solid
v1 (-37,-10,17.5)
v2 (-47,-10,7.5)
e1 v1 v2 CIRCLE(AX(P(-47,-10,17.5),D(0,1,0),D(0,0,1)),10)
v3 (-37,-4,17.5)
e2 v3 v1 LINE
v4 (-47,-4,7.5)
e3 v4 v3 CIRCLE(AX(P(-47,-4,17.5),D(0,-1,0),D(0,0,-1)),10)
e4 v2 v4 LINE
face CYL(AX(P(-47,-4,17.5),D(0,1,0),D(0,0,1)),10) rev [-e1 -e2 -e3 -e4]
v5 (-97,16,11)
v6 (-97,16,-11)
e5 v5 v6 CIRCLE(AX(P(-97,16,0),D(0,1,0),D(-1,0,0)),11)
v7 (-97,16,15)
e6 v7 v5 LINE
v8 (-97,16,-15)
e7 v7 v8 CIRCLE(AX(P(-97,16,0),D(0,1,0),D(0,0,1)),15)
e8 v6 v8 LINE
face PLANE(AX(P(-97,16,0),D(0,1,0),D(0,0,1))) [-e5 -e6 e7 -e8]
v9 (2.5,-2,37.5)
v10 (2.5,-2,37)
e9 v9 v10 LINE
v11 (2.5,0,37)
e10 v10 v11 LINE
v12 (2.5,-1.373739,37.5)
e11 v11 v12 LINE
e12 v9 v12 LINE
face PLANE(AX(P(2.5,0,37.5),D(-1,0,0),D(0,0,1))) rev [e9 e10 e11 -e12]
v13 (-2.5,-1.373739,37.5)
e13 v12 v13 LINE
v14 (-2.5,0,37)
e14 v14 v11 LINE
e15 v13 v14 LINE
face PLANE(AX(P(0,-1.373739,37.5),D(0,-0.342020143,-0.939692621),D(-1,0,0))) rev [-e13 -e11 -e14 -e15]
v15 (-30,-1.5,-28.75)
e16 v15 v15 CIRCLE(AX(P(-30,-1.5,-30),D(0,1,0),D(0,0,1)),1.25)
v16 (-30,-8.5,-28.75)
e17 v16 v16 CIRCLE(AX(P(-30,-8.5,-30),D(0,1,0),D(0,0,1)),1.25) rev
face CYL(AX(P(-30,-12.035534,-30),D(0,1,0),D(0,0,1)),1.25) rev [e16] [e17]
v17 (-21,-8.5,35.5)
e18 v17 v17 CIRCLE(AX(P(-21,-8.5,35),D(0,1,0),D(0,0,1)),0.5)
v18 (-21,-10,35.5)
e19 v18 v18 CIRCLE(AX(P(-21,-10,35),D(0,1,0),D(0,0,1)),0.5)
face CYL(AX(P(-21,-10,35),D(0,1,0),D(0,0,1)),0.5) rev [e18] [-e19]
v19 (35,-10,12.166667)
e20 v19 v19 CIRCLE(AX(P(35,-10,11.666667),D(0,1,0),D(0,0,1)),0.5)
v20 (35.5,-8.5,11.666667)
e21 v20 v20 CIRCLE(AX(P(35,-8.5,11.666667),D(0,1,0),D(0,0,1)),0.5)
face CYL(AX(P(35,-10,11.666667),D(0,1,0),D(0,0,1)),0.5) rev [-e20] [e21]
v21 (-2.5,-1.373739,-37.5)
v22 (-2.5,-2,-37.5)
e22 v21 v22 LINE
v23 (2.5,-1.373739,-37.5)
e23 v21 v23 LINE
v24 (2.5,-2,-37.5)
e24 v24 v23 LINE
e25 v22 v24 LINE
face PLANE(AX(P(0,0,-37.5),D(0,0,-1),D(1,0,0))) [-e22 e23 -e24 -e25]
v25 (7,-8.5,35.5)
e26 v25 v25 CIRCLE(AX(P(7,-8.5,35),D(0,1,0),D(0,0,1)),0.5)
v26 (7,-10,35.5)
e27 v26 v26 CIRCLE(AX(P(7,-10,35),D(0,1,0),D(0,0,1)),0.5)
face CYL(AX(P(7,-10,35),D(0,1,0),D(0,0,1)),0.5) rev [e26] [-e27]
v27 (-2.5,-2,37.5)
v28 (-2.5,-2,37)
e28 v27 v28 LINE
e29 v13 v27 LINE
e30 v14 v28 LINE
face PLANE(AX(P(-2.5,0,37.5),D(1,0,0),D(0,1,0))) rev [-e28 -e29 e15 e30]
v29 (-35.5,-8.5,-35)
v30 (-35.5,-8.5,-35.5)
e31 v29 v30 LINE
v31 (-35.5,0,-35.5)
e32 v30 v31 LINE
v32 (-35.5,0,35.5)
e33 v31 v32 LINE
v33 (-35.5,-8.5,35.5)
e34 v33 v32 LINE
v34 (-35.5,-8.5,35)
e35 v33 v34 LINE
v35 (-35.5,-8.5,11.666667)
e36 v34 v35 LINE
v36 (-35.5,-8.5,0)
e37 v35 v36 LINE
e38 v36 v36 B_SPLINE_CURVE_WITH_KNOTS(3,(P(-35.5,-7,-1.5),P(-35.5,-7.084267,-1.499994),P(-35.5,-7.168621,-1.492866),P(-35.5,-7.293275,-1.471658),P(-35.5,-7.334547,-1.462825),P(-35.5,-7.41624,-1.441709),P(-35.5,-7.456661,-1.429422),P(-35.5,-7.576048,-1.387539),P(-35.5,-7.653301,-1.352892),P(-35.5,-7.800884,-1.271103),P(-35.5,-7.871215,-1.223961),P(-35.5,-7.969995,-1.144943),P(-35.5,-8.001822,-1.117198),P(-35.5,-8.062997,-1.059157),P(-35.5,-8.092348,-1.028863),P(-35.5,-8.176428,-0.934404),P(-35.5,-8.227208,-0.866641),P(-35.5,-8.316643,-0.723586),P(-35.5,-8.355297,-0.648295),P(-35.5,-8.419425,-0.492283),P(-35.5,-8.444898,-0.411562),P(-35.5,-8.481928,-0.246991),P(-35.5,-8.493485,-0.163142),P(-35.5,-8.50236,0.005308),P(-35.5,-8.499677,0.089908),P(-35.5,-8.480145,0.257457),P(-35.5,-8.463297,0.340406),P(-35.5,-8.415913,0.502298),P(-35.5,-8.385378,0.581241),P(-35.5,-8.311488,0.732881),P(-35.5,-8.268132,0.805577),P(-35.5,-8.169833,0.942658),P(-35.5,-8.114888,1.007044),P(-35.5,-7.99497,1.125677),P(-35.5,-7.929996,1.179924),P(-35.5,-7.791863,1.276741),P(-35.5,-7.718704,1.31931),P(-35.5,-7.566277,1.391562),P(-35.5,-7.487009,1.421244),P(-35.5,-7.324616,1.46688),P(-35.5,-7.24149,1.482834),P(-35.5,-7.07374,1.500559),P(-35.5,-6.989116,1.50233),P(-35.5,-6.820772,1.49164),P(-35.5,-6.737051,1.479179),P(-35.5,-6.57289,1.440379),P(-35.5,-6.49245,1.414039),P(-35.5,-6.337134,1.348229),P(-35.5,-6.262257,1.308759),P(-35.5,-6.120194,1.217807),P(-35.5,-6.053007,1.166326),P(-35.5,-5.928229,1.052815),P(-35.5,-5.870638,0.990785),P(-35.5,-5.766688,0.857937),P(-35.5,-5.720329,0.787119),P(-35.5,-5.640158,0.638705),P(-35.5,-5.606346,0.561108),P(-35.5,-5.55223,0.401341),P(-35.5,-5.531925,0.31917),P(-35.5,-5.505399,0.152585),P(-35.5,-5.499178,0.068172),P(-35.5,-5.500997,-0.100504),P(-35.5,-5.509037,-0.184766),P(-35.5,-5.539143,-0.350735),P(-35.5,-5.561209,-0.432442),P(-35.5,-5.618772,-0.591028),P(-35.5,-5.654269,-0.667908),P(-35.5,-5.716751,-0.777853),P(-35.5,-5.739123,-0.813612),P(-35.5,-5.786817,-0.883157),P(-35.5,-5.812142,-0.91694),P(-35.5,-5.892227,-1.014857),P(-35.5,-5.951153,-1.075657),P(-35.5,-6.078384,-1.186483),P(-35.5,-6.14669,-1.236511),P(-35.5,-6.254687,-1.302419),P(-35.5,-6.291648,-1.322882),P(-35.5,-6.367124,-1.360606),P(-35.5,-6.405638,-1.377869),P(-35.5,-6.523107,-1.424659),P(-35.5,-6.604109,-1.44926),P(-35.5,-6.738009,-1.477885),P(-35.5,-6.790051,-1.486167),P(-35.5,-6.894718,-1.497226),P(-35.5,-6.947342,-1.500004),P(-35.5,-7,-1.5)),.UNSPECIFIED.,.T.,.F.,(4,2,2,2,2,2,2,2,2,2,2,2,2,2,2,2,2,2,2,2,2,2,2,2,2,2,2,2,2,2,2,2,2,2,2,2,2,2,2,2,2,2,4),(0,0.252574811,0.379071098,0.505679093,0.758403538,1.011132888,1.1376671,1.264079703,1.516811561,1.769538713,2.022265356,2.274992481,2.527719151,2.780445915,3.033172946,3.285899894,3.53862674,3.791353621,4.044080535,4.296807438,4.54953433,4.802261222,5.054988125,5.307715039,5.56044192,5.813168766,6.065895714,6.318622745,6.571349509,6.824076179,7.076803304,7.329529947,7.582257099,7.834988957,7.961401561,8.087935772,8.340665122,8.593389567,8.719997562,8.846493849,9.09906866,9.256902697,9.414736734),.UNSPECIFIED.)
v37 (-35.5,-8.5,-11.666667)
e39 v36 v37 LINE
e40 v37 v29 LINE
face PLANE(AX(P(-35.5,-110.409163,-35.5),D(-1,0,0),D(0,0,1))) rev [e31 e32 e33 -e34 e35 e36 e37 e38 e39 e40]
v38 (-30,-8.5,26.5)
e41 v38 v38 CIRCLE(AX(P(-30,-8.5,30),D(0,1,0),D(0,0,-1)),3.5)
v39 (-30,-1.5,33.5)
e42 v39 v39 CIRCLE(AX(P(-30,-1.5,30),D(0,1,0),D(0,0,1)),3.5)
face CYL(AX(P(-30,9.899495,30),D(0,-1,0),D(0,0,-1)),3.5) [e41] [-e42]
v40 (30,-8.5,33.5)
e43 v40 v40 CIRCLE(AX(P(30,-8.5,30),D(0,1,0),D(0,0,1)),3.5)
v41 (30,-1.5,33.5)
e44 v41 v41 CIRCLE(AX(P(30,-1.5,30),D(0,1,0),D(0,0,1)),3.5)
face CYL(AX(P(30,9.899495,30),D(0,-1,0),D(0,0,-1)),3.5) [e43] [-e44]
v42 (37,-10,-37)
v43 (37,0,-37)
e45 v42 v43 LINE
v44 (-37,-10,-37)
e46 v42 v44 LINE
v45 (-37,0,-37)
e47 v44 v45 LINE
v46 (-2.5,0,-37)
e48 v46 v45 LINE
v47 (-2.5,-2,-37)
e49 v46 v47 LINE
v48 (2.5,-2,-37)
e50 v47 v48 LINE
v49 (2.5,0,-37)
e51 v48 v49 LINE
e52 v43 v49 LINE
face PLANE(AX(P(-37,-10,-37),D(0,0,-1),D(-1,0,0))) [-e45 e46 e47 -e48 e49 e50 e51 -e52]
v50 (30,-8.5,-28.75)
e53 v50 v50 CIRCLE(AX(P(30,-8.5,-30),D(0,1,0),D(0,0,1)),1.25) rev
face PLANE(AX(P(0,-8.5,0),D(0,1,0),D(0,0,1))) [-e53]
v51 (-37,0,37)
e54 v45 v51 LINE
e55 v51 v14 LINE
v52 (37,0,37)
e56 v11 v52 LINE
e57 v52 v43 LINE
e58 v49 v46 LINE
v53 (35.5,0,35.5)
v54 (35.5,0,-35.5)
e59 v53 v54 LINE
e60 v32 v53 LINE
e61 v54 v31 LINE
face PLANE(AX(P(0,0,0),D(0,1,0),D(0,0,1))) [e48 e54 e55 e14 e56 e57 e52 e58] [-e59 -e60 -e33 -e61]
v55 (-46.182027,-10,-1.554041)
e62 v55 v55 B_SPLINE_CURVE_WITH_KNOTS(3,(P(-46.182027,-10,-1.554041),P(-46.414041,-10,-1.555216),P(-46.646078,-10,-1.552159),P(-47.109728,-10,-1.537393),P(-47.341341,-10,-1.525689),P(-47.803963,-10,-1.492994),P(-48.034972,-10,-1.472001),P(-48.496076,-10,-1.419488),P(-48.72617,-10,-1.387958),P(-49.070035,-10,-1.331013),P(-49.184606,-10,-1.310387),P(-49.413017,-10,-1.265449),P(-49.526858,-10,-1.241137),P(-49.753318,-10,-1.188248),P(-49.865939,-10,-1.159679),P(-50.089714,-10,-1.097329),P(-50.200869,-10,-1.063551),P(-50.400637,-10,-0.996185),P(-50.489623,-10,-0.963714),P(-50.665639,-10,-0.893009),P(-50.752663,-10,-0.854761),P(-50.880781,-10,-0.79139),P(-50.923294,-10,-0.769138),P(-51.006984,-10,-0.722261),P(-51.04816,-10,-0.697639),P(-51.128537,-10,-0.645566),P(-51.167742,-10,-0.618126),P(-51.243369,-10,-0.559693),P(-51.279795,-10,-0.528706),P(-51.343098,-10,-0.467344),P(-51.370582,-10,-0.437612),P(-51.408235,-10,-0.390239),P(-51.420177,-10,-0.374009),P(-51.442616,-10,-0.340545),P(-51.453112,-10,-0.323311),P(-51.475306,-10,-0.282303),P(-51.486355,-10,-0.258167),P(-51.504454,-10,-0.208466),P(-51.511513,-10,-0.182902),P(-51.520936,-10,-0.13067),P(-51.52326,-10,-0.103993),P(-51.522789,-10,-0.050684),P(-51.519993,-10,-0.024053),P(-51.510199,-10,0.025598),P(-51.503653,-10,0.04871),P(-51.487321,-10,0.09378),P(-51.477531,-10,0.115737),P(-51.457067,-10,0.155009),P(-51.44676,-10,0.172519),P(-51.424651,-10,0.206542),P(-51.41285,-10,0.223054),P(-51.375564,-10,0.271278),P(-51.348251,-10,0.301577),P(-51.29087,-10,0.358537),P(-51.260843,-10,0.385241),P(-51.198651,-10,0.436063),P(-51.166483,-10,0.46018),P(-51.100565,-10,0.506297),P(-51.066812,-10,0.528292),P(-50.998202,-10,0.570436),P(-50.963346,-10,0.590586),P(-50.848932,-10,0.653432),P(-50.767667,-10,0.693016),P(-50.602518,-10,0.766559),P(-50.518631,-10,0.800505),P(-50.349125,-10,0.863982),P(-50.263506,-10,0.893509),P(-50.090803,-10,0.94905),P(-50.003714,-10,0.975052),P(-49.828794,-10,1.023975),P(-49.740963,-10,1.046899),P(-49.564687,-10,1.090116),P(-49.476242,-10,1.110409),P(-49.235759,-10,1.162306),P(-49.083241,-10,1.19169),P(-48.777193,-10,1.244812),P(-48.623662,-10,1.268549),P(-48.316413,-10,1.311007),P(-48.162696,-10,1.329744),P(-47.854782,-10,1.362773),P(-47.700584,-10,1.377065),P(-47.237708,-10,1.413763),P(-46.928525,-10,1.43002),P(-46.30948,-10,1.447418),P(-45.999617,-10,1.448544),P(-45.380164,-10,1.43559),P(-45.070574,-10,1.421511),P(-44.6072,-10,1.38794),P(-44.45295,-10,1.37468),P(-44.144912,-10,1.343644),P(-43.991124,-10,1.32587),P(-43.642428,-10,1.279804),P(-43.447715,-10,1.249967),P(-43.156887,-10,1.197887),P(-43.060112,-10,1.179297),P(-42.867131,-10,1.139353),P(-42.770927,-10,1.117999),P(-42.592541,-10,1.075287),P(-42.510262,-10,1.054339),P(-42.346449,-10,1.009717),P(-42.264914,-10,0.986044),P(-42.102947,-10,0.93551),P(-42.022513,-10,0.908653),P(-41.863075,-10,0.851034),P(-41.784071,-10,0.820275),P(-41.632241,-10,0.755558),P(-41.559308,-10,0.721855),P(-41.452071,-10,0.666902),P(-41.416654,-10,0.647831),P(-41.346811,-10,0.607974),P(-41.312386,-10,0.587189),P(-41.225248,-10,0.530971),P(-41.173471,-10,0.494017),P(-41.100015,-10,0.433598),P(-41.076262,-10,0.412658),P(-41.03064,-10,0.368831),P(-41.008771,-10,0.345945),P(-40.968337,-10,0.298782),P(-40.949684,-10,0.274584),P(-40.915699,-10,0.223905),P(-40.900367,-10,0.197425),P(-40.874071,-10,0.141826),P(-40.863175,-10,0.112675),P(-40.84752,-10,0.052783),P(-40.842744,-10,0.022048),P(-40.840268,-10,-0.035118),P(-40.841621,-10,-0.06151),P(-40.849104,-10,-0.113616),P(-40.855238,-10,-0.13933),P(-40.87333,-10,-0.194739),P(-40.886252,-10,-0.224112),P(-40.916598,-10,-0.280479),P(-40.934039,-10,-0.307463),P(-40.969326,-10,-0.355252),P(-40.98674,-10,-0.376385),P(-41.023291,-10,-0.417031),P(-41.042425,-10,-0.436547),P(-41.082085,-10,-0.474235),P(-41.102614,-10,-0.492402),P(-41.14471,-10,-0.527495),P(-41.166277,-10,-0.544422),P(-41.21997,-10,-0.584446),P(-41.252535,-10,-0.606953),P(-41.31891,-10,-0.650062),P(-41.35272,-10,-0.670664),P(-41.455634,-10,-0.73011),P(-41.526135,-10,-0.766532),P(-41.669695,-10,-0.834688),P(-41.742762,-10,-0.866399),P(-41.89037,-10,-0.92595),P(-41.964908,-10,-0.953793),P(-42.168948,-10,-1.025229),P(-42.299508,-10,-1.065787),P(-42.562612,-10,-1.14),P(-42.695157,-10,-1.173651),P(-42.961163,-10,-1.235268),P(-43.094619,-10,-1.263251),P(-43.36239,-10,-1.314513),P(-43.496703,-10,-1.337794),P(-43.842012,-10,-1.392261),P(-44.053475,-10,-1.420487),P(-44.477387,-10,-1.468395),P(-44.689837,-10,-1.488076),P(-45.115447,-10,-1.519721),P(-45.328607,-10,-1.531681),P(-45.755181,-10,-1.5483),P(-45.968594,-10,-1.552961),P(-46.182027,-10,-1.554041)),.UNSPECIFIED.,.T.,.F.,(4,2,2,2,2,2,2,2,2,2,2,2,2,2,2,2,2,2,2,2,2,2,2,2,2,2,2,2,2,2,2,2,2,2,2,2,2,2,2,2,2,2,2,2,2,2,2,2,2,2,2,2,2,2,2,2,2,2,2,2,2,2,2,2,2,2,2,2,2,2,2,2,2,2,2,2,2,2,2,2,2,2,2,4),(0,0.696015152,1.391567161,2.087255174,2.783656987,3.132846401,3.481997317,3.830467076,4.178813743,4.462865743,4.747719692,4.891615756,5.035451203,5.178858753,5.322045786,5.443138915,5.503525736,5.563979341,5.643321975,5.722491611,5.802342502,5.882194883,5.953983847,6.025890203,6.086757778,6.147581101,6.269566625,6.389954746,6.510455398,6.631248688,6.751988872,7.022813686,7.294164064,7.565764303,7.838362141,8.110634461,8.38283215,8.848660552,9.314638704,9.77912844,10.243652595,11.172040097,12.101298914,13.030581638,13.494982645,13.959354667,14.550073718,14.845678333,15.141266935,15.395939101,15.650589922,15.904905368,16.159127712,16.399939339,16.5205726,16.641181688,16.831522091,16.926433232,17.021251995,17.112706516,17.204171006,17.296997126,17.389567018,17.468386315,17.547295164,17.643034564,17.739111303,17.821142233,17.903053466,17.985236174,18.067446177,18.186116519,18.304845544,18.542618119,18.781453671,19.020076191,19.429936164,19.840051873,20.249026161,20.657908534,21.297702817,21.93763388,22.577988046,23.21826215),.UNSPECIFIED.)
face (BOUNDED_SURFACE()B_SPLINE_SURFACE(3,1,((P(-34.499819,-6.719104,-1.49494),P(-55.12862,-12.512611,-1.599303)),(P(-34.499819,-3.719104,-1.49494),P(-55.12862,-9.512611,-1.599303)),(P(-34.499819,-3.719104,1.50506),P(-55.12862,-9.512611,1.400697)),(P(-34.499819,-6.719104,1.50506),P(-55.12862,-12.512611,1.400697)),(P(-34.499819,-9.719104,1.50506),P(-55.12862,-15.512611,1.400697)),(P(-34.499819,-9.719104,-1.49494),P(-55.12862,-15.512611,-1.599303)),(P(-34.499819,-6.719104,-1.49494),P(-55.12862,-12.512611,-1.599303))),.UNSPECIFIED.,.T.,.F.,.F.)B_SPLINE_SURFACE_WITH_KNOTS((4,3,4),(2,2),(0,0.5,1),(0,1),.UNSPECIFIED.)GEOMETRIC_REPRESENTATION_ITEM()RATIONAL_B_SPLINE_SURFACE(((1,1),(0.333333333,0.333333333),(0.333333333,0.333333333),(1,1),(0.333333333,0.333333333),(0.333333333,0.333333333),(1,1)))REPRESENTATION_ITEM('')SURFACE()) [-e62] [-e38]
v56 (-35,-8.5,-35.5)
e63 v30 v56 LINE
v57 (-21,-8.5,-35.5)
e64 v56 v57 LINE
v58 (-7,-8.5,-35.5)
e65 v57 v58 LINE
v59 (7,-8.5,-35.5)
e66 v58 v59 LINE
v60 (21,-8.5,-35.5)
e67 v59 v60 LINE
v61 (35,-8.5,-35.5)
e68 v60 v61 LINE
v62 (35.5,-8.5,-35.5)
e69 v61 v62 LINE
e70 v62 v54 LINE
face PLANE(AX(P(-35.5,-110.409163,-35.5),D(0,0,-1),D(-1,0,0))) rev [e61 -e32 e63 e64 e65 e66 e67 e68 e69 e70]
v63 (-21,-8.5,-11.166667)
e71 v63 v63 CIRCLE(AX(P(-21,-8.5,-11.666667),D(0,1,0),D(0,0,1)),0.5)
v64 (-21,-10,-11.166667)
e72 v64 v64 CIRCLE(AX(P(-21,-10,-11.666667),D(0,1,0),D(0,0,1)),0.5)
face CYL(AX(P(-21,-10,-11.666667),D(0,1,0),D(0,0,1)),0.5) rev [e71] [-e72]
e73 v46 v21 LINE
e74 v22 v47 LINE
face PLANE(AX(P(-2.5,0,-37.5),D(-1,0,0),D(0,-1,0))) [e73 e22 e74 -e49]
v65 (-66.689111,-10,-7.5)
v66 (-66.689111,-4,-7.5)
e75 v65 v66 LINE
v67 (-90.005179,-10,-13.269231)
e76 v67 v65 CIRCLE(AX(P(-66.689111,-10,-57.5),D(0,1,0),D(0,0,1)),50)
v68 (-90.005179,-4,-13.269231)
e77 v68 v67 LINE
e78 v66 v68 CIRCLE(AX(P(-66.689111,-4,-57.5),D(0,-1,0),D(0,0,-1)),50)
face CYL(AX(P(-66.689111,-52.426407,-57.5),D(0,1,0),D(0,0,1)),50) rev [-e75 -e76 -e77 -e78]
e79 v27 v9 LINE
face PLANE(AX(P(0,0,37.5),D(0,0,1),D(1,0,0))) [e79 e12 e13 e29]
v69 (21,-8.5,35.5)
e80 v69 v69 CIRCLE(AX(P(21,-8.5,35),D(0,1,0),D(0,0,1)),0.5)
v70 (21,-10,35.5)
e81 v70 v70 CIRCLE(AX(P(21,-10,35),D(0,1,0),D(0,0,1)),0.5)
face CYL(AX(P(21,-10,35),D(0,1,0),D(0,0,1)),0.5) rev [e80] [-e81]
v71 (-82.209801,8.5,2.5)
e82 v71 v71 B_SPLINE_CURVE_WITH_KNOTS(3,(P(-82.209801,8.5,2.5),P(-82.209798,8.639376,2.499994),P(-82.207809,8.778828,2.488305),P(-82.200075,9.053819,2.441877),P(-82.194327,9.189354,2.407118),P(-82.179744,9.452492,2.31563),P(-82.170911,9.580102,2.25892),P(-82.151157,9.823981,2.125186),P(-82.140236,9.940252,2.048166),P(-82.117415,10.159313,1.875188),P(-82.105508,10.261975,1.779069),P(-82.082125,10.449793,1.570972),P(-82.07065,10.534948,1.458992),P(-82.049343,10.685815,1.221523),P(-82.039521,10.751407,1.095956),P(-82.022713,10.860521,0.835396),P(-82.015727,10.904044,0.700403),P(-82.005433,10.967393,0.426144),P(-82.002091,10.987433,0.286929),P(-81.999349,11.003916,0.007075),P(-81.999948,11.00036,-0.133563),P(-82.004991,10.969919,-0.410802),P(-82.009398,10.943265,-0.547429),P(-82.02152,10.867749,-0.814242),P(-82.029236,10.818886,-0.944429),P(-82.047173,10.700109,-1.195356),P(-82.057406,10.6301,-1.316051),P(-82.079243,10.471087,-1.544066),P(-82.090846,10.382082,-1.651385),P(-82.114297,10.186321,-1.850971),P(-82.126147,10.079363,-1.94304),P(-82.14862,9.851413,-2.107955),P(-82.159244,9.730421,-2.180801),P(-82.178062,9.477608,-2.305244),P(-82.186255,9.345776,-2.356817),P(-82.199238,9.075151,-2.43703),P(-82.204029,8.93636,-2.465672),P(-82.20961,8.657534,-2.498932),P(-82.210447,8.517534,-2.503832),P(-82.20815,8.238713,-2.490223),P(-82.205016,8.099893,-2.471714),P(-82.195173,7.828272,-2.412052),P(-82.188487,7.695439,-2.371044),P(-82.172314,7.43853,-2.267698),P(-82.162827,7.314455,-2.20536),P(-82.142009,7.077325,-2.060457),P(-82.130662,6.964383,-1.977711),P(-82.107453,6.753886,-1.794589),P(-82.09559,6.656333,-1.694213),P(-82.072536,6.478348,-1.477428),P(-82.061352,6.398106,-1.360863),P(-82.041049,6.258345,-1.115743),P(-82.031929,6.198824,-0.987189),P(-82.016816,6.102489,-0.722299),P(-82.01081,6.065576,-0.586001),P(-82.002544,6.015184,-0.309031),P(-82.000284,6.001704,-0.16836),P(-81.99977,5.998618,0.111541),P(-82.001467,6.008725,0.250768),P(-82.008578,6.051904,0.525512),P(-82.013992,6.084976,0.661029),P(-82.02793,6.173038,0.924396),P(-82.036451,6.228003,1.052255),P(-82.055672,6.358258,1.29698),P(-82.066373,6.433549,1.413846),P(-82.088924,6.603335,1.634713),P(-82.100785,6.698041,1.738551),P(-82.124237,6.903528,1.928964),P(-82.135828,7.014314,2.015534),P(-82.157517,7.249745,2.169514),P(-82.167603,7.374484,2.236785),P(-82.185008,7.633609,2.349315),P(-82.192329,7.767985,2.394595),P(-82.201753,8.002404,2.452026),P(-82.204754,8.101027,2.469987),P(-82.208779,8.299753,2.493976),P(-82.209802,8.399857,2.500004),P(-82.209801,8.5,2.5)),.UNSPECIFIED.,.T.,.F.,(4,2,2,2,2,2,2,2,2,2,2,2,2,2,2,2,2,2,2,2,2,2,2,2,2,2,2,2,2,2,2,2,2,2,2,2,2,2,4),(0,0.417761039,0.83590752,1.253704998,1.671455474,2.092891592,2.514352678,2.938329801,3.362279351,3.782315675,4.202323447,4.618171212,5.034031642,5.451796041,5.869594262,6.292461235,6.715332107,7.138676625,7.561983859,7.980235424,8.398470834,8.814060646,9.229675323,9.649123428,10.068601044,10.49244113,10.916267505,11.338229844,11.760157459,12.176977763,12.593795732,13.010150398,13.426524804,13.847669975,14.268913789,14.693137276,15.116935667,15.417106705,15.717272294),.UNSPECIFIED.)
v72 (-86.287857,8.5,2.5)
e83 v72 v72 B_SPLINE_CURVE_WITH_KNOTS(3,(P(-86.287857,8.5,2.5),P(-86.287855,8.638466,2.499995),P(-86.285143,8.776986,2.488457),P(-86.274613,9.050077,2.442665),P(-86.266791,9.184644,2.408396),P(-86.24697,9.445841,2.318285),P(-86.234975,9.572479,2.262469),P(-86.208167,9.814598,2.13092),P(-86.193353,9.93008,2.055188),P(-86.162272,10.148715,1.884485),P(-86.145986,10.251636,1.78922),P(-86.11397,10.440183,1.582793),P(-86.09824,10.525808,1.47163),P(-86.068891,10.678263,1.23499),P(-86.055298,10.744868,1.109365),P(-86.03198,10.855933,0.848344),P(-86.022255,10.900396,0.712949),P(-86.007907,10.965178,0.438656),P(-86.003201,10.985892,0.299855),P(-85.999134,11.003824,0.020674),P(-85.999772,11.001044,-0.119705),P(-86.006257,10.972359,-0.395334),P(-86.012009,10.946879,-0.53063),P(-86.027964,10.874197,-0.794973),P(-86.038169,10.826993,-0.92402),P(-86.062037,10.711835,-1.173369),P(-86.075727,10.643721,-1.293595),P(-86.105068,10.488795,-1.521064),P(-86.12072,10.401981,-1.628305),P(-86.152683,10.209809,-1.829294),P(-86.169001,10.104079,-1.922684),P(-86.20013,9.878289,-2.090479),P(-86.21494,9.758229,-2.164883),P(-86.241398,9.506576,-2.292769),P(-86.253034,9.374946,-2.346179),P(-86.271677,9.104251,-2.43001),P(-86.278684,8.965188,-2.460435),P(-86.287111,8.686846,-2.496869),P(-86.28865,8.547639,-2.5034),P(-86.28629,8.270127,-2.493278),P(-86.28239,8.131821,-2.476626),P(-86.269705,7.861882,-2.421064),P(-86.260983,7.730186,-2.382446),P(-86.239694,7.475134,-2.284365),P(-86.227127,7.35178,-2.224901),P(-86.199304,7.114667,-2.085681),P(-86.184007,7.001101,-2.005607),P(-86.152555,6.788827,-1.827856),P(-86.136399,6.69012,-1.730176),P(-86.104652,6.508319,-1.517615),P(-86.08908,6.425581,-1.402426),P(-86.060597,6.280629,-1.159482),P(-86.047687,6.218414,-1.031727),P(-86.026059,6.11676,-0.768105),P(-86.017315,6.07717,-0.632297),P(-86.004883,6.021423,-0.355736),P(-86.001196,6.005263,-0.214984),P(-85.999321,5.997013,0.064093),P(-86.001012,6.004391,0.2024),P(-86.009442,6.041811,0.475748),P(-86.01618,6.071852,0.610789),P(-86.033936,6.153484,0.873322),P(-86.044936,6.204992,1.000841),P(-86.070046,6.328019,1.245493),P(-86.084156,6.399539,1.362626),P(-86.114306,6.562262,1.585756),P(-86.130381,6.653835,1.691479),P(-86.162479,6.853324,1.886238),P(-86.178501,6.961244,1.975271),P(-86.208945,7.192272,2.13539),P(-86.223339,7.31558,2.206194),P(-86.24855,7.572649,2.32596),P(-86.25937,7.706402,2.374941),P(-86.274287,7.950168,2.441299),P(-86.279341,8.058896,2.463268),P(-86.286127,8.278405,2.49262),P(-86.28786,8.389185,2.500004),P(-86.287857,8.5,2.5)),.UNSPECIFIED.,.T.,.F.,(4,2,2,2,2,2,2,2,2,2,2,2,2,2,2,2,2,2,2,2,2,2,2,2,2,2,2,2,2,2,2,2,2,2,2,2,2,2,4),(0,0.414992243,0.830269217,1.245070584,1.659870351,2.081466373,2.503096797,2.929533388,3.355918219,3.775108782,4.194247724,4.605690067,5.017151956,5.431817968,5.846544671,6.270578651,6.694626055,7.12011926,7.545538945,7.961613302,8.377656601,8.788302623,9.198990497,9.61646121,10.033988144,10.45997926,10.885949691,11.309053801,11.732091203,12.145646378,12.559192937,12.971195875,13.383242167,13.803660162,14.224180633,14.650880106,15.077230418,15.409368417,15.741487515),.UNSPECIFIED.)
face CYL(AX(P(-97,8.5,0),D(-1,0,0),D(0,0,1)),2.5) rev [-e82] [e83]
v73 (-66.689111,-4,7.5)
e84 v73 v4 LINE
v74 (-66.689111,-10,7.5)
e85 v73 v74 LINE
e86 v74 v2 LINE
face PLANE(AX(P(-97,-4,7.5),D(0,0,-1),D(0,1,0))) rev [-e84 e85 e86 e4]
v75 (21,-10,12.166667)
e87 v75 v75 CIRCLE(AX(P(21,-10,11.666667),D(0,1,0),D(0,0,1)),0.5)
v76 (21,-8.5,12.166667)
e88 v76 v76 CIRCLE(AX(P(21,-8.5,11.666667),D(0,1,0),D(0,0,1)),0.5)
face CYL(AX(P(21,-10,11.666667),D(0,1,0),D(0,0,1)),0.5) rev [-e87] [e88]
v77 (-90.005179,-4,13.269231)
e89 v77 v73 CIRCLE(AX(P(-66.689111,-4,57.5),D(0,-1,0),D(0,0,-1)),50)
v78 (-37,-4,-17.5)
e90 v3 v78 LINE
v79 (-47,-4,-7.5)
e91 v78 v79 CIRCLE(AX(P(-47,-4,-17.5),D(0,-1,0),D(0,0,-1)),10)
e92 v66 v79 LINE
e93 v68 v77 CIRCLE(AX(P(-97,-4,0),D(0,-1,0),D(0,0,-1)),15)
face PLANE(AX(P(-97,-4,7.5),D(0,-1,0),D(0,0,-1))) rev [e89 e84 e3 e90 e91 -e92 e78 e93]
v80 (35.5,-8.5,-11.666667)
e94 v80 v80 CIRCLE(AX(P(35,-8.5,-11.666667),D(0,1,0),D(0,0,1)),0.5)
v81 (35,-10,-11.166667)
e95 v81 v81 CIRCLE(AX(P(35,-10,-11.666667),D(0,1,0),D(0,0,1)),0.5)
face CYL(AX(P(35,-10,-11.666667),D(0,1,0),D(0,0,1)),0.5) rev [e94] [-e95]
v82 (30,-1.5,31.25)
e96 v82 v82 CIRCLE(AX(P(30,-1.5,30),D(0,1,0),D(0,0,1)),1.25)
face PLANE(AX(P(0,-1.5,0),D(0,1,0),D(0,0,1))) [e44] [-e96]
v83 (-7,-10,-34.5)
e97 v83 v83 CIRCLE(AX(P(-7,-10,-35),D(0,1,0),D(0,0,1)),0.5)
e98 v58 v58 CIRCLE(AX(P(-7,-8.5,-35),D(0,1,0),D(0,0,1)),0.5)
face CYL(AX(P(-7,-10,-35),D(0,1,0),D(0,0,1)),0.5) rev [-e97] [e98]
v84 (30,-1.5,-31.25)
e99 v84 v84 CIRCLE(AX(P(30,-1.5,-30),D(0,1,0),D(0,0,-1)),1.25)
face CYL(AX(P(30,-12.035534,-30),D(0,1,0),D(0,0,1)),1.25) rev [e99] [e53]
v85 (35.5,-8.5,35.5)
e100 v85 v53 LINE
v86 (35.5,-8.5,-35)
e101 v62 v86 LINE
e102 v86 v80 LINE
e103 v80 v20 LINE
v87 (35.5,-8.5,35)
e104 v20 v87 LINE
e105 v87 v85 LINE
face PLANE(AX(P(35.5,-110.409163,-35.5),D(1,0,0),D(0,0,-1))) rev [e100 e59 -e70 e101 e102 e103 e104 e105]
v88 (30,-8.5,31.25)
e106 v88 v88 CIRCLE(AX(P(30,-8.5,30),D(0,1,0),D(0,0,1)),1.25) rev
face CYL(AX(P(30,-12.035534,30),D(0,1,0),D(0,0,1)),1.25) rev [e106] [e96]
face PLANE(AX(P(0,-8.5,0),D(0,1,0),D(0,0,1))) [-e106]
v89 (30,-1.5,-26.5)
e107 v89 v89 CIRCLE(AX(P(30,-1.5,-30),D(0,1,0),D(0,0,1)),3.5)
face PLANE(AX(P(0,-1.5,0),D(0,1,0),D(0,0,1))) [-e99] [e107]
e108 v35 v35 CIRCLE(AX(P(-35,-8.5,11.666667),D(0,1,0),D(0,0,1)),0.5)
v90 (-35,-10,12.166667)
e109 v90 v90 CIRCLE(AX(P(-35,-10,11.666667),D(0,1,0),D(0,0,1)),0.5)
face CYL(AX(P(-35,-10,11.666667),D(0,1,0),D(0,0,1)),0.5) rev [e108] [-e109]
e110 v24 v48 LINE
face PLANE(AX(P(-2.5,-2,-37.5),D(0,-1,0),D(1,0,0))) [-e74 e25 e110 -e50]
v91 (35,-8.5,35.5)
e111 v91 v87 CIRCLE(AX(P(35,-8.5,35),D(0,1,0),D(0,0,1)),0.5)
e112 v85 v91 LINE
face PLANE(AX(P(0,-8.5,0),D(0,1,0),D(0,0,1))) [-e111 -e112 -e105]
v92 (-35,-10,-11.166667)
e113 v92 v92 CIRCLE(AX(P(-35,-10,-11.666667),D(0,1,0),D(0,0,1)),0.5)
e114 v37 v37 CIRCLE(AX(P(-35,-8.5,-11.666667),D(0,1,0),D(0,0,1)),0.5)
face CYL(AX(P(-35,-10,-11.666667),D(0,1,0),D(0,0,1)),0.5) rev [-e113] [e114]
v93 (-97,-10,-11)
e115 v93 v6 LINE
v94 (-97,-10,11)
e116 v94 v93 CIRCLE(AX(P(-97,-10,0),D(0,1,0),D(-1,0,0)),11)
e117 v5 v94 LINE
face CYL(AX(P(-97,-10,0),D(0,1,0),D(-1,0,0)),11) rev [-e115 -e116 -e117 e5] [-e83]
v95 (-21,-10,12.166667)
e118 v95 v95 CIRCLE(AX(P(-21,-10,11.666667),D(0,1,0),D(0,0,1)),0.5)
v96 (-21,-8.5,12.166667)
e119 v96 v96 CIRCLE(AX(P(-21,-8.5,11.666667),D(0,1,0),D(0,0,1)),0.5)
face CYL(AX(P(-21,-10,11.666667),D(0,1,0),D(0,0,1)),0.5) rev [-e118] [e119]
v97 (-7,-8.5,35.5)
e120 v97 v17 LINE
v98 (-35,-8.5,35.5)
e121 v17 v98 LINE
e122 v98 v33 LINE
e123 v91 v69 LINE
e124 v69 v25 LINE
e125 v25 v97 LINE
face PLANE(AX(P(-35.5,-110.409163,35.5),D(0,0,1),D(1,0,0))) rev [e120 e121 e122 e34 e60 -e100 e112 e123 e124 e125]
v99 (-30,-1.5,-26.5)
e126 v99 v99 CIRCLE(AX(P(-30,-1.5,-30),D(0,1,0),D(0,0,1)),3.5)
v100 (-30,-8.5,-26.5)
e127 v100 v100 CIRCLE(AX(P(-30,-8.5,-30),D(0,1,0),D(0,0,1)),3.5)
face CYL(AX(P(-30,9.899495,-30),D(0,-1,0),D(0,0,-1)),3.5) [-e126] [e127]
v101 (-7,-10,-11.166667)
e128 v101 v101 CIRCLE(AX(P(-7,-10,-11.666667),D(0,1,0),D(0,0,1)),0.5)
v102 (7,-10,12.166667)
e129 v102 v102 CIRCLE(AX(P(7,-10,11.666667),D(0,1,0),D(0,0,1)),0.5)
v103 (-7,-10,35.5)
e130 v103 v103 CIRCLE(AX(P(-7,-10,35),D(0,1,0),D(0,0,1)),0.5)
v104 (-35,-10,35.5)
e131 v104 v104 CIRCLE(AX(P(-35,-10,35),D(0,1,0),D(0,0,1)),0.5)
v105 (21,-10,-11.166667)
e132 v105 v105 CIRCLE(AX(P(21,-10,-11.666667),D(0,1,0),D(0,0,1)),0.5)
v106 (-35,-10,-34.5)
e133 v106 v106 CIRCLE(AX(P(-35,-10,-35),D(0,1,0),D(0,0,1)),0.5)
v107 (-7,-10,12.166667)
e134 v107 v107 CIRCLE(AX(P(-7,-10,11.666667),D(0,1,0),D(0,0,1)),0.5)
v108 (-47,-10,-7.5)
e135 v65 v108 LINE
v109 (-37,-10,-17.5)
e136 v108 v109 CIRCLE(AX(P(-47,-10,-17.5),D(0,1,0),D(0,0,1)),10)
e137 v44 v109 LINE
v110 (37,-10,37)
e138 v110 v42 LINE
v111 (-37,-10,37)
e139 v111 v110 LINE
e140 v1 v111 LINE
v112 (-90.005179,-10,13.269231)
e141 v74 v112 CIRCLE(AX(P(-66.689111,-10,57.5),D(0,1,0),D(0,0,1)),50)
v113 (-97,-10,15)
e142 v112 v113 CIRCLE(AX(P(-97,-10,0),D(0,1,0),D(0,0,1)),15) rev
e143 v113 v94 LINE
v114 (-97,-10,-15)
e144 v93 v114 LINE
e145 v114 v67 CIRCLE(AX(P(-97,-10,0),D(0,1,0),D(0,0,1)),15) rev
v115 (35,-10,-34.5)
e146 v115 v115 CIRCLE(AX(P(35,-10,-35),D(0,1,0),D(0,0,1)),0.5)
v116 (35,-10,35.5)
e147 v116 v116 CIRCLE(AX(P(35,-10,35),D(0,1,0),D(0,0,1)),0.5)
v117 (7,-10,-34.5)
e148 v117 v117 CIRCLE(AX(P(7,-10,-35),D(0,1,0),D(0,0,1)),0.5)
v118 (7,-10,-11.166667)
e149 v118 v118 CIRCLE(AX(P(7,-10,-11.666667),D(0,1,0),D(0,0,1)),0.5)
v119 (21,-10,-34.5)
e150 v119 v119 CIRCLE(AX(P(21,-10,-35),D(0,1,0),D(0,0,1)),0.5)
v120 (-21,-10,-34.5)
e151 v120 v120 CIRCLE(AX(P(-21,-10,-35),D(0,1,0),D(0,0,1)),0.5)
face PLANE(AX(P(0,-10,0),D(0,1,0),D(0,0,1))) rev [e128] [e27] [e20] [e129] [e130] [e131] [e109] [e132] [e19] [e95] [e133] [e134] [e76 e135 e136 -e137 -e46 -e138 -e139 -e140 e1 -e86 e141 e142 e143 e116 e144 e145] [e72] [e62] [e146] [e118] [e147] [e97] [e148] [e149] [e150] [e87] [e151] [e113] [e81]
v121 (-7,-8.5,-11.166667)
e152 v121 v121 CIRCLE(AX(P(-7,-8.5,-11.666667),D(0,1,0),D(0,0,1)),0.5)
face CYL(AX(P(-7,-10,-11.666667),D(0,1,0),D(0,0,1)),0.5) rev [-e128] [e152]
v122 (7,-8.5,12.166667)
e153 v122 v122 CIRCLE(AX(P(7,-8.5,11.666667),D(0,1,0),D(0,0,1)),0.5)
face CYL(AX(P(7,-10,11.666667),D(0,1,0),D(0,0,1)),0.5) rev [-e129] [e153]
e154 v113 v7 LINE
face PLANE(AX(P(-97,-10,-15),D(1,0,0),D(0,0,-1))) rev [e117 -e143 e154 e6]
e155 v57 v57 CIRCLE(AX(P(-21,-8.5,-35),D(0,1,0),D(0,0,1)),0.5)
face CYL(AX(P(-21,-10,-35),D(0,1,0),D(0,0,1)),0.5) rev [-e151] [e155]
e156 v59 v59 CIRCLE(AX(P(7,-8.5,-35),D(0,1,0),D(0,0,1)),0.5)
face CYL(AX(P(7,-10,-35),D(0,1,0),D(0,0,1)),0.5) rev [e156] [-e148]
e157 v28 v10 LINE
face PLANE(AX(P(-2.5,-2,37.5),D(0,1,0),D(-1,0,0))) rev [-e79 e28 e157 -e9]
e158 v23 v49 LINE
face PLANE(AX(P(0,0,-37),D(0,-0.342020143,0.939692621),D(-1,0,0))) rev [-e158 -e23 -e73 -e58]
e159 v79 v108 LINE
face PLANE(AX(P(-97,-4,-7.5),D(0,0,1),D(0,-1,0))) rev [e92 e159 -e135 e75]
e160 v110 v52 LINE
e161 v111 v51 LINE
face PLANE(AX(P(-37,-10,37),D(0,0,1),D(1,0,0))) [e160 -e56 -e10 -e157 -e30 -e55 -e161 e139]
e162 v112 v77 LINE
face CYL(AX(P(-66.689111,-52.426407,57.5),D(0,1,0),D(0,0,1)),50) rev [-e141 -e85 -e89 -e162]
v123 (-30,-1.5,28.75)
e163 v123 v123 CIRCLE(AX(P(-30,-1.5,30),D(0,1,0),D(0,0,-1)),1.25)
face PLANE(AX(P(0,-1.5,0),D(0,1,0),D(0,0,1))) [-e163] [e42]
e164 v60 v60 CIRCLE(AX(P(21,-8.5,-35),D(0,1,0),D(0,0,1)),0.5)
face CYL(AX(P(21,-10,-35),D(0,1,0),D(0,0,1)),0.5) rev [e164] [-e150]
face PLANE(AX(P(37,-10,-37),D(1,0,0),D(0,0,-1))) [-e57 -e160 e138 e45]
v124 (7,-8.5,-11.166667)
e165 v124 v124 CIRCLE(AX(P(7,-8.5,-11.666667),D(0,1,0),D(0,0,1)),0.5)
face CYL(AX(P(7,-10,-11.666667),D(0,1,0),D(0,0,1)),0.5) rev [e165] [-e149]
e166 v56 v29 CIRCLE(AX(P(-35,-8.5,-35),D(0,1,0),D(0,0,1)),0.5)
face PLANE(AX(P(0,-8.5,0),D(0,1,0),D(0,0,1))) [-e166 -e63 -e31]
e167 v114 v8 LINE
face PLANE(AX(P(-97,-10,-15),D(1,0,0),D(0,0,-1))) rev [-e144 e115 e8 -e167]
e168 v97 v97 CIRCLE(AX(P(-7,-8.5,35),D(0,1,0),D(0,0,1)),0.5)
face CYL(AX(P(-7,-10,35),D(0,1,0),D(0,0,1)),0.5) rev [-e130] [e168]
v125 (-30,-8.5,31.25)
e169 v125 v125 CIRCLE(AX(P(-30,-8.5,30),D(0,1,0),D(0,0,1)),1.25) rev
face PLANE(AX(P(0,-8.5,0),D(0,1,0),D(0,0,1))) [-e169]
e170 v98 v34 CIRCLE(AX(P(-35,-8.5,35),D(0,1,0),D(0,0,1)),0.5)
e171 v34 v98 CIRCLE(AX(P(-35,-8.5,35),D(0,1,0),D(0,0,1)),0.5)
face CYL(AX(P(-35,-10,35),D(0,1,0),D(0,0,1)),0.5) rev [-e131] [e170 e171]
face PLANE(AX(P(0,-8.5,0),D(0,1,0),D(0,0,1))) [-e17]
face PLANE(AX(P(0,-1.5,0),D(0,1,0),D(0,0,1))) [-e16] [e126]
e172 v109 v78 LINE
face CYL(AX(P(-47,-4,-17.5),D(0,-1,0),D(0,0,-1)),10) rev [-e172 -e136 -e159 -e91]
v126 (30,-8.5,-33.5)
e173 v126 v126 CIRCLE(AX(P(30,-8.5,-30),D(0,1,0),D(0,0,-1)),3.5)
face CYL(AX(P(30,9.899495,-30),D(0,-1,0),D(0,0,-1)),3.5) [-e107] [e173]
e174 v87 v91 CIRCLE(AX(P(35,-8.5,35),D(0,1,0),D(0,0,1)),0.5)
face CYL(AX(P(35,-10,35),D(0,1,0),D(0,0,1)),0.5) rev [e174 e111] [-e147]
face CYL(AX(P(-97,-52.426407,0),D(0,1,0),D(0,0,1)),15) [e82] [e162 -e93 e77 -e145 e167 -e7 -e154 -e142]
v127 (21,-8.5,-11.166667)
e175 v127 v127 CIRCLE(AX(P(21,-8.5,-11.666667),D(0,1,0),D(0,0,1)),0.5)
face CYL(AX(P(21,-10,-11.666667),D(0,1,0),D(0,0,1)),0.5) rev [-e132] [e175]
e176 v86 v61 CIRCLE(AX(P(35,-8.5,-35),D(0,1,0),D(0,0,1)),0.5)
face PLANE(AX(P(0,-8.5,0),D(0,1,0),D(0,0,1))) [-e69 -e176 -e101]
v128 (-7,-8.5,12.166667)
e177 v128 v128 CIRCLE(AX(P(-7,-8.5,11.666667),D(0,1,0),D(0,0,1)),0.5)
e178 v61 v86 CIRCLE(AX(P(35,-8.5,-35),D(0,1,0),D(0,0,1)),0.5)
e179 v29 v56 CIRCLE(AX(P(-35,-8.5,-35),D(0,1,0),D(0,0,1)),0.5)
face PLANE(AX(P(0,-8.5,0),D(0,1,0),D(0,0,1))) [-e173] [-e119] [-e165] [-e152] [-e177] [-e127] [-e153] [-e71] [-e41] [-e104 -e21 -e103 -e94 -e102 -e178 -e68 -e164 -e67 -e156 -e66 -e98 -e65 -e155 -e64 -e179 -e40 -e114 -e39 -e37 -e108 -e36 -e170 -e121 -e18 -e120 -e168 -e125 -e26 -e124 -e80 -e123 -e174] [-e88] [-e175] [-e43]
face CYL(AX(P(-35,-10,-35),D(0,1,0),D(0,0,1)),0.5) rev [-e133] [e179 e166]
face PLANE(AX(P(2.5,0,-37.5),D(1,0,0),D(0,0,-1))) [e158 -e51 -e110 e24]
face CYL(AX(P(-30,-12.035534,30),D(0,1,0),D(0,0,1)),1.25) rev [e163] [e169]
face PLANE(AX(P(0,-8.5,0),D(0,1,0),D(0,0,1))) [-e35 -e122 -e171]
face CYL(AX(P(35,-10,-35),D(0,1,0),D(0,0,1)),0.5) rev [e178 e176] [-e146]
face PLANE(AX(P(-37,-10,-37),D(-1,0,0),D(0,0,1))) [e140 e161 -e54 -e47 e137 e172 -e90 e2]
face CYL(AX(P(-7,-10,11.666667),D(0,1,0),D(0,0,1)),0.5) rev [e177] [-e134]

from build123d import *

# Parameters (mm, degrees)
SKETCH_1_W                  = 74
SKETCH_1_H                  = 74
EXTRUDE_1_DEPTH             = 10
SKETCH_2_W                  = 71
SKETCH_2_H                  = 71
CUT_EXTRUDE_1_DEPTH         = 8.5
SKETCH_3_R                  = 3.5
EXTRUDE_2_DEPTH             = 7
SKETCH_4_R                  = 1.25
CUT_EXTRUDE_2_DEPTH         = 7
SKETCH_5_W                  = 5
SKETCH_5_H                  = 2
EXTRUDE_3_DEPTH             = 0.5
CHAMFER_1_SIZE              = 0.5
CHAMFER_1_SIZE2             = 1.37373871
CHAMFER_1_OF_MIRROR_1_SIZE2 = 1.37373871
CHAMFER_1_OF_MIRROR_1_SIZE  = 0.5
SKETCH_6_W                  = 15
SKETCH_6_H                  = 6
EXTRUDE_4_DEPTH             = 60
FILLET_1_R                  = 10
SKETCH_8_R                  = 15
EXTRUDE_5_DEPTH             = 20
EXTRUDE_5_DIRECTION_2_REACH = 106.169
SKETCH_9_W                  = 15
SKETCH_9_H                  = 30
CUT_EXTRUDE_3_DEPTH         = 121.939034228
SKETCH_10_R                 = 11
CUT_EXTRUDE_4_DEPTH         = 108.197248099
FILLET_2_R                  = 50
CUT_EXTRUDE_5_DEPTH         = 155.477344617
CUT_EXTRUDE_5_DEPTH_BACK    = 155.477344617
SKETCH_11_R                 = 2.5
SWEEP_START                 = -53
SWEEP_1_DEPTH               = 17.335664095
SKETCH_18_R                 = 0.5
CUT_EXTRUDE_7_DEPTH         = 107.843343379


with BuildPart() as part:
    # Эскиз1 → Бобышка-Вытянуть1 (new body)
    with BuildSketch(Plane(origin=(0, 0, 0), x_dir=(1, 0, 0), z_dir=(0, 1, 0))):
        Rectangle(SKETCH_1_W, SKETCH_1_H)
    extrude(amount=-EXTRUDE_1_DEPTH)

    # Эскиз2 → Вырез-Вытянуть1 (cut)
    with BuildSketch(Plane(origin=(0, 0, 0), x_dir=(1, 0, 0), z_dir=(0, 1, 0))):
        Rectangle(SKETCH_2_W, SKETCH_2_H)
    extrude(amount=-CUT_EXTRUDE_1_DEPTH, mode=Mode.SUBTRACT)

    # Эскиз3 → Бобышка-Вытянуть2 (add)
    with BuildSketch(Plane(origin=(0, -8.5, 0), x_dir=(1, 0, 0), z_dir=(0, 1, 0))):
        with Locations(Location((-30, 30, 0), (0, 0, 270))):
            Circle(SKETCH_3_R)
        with Locations(Location((30, 30, 0), (0, 0, 90))):
            Circle(SKETCH_3_R)
        with Locations(Location((30, -30, 0), (0, 0, 270))):
            Circle(SKETCH_3_R)
        with Locations(Location((-30, -30, 0), (0, 0, 90))):
            Circle(SKETCH_3_R)
    extrude(amount=EXTRUDE_2_DEPTH)

    # Эскиз4 → Вырез-Вытянуть2 (cut)
    with BuildSketch(Plane(origin=(0, -1.5, 0), x_dir=(1, 0, 0), z_dir=(0, 1, 0))):
        with Locations(Location((-30, 30, 0), (0, 0, 270))):
            Circle(SKETCH_4_R)
        with Locations(Location((-30, -30, 0), (0, 0, 270))):
            Circle(SKETCH_4_R)
        with Locations(Location((30, 30, 0), (0, 0, 270))):
            Circle(SKETCH_4_R)
        with Locations(Location((30, -30, 0), (0, 0, 270))):
            Circle(SKETCH_4_R)
    extrude(amount=-CUT_EXTRUDE_2_DEPTH, mode=Mode.SUBTRACT)

    # Эскиз5 → Бобышка-Вытянуть3 (add)
    with BuildSketch(Plane.XY.offset(37)):
        with Locations((0, -1)):
            Rectangle(SKETCH_5_W, SKETCH_5_H)
    extrude_3 = extrude(amount=EXTRUDE_3_DEPTH)

    # Фаска1
    chamfer_1_edges = [part.edges().sort_by_distance(p)[0] for p in [
        (0, 0, 37.5),
    ]]
    chamfer_1_side = [part.faces().sort_by_distance(p)[0] for p in [
        (0, 0, -35.949940478),
    ]]
    chamfer(chamfer_1_edges, length=CHAMFER_1_SIZE, length2=CHAMFER_1_SIZE2, reference=chamfer_1_side[0])

    # Зеркальное отражение1: Бобышка-Вытянуть3 across plane
    add(extrude_3.mirror(Plane.XY))

    # Фаска1 of Зеркальное отражение1
    chamfer_1_of_mirror_1_edges = [part.edges().sort_by_distance(p)[0] for p in [
        (0, 0, -37.5),
    ]]
    chamfer(chamfer_1_of_mirror_1_edges, length=CHAMFER_1_OF_MIRROR_1_SIZE, length2=CHAMFER_1_OF_MIRROR_1_SIZE2)

    # Эскиз6 → Бобышка-Вытянуть4 (add)
    with BuildSketch(Plane.ZY.offset(37)):
        with Locations((0, -7)):
            Rectangle(SKETCH_6_W, SKETCH_6_H)
    extrude(amount=EXTRUDE_4_DEPTH)

    # Скругление1
    fillet_1_edges = [part.edges().sort_by_distance(p)[0] for p in [
        (-37, -7, 7.5),
        (-37, -7, -7.5),
    ]]
    fillet(fillet_1_edges, radius=FILLET_1_R)

    # Эскиз8 → Бобышка-Вытянуть5 (add)
    with BuildSketch(Plane(origin=(0, -4, 0), x_dir=(0, 0, -1), z_dir=(0, 1, 0))):
        with Locations(Location((0, 97, 0), (0, 0, 180))):
            Circle(SKETCH_8_R)
    extrude(amount=EXTRUDE_5_DEPTH)

    # Бобышка-Вытянуть5 direction 2: up to this face of the body (flat: up to its plane)
    extrude_5_direction_2_end = Plane(part.part.faces().sort_by_distance((-9.656440707, -10, 0))[0])
    # Эскиз8 → Бобышка-Вытянуть5 direction 2 (add, up to the picked face)
    with BuildSketch(Plane(origin=(0, -4, 0), x_dir=(0, 0, -1), z_dir=(0, 1, 0)), mode=Mode.PRIVATE) as extrude_5_direction_2_sk1:
        with Locations(Location((0, 97, 0), (0, 0, 180))):
            Circle(SKETCH_8_R)
    extrude_5_direction_2_tool1 = split(extrude(extrude_5_direction_2_sk1.sketch, amount=-EXTRUDE_5_DIRECTION_2_REACH, mode=Mode.PRIVATE), bisect_by=extrude_5_direction_2_end, keep=Keep.BOTH, mode=Mode.PRIVATE)
    add(extrude_5_direction_2_tool1.solids().sort_by(Axis((-97, -4, 0), (0, -1, 0)))[0])

    # Эскиз9 → Вырез-Вытянуть3 (cut, through all)
    with BuildSketch(Plane(origin=(0, 16, 0), x_dir=(1, 0, 0), z_dir=(0, 1, 0))):
        with Locations((-104.5, 0)):
            Rectangle(SKETCH_9_W, SKETCH_9_H)
    extrude(amount=-CUT_EXTRUDE_3_DEPTH, mode=Mode.SUBTRACT)

    # Эскиз10 → Вырез-Вытянуть4 (cut, through all)
    with BuildSketch(Plane(origin=(0, 16, 0), x_dir=(1, 0, 0), z_dir=(0, 1, 0))):
        with Locations((-97, 0)):
            Circle(SKETCH_10_R)
    extrude(amount=-CUT_EXTRUDE_4_DEPTH, mode=Mode.SUBTRACT)

    # Скругление2
    fillet_2_edges = [part.edges().sort_by_distance(p)[0] for p in [
        (-84.009618943, -7, -7.5),
        (-84.009618943, -7, 7.5),
    ]]
    fillet(fillet_2_edges, radius=FILLET_2_R)

    # Эскиз11 → Вырез-Вытянуть5 (cut, two sides: drawn at the far end of the back side and taken through both)
    with BuildSketch(Plane(origin=(-112, 0, 0), x_dir=(0, 0, 1), z_dir=(1, 0, 0)).offset(-CUT_EXTRUDE_5_DEPTH_BACK)):
        with Locations((0, -8.5)):
            Circle(SKETCH_11_R)
    extrude(amount=CUT_EXTRUDE_5_DEPTH + CUT_EXTRUDE_5_DEPTH_BACK, mode=Mode.SUBTRACT)

    # Вырез-По траектории1: read off the stored shape, not the designer's step
    # Вырез-По траектории1 outline → Вырез-По траектории1 (cut)
    with BuildSketch(Plane(origin=(0, 0, 0), x_dir=(-0.27037806600999104, 0.962753255180235, -0.0013678671566966505), z_dir=(0.9627409348714416, 0.27038152606985083, 0.004870593701078593)).offset(SWEEP_START)):
        with BuildLine():
            add(Edge.make_bspline(
                [(2.861200358, -1.320385383), (5.749460123, -1.320385383), (5.745356522, 1.679576226), (2.857096756, 1.679576226), (-0.031163009, 1.679576226), (-0.027059408, -1.320385383), (2.861200358, -1.320385383)],
                knots=[0, 0, 0, 0, 0.5, 0.5, 0.5, 1, 1, 1, 1], degree=3, weights=[1, 0.333333333, 0.333333333, 1, 0.333333333, 0.333333333, 1]))
        make_face()
    extrude(amount=SWEEP_1_DEPTH, mode=Mode.SUBTRACT)

    # Эскиз18 → Вырез-Вытянуть7 (cut, through all)
    with BuildSketch(Plane(origin=(0, -8.5, 0), x_dir=(1, 0, 0), z_dir=(0, 1, 0))):
        with Locations(Location((-35, 35, 0), (0, 0, 270))):
            Circle(SKETCH_18_R)
        with Locations(Location((-21, 35, 0), (0, 0, 270))):
            Circle(SKETCH_18_R)
        with Locations(Location((-7, 35, 0), (0, 0, 270))):
            Circle(SKETCH_18_R)
        with Locations(Location((7, 35, 0), (0, 0, 270))):
            Circle(SKETCH_18_R)
        with Locations(Location((21, 35, 0), (0, 0, 270))):
            Circle(SKETCH_18_R)
        with Locations(Location((35, 35, 0), (0, 0, 270))):
            Circle(SKETCH_18_R)
        with Locations(Location((-21, 11.666666667, 0), (0, 0, 270))):
            Circle(SKETCH_18_R)
        with Locations(Location((-7, 11.666666667, 0), (0, 0, 270))):
            Circle(SKETCH_18_R)
        with Locations(Location((7, 11.666666667, 0), (0, 0, 270))):
            Circle(SKETCH_18_R)
        with Locations(Location((21, 11.666666667, 0), (0, 0, 270))):
            Circle(SKETCH_18_R)
        with Locations(Location((35, 11.666666667, 0), (0, 0, 270))):
            Circle(SKETCH_18_R)
        with Locations(Location((-21, -11.666666667, 0), (0, 0, 270))):
            Circle(SKETCH_18_R)
        with Locations(Location((-7, -11.666666667, 0), (0, 0, 270))):
            Circle(SKETCH_18_R)
        with Locations(Location((7, -11.666666667, 0), (0, 0, 270))):
            Circle(SKETCH_18_R)
        with Locations(Location((21, -11.666666667, 0), (0, 0, 270))):
            Circle(SKETCH_18_R)
        with Locations(Location((35, -11.666666667, 0), (0, 0, 270))):
            Circle(SKETCH_18_R)
        with Locations(Location((-21, -35, 0), (0, 0, 270))):
            Circle(SKETCH_18_R)
        with Locations(Location((-7, -35, 0), (0, 0, 270))):
            Circle(SKETCH_18_R)
        with Locations(Location((7, -35, 0), (0, 0, 270))):
            Circle(SKETCH_18_R)
        with Locations(Location((21, -35, 0), (0, 0, 270))):
            Circle(SKETCH_18_R)
        with Locations(Location((35, -35, 0), (0, 0, 270))):
            Circle(SKETCH_18_R)
        with Locations(Location((-35, 11.666666667, 0), (0, 0, 270))):
            Circle(SKETCH_18_R)
        with Locations(Location((-35, -11.666666667, 0), (0, 0, 270))):
            Circle(SKETCH_18_R)
        with Locations(Location((-35, -35, 0), (0, 0, 270))):
            Circle(SKETCH_18_R)
    extrude(amount=-CUT_EXTRUDE_7_DEPTH, mode=Mode.SUBTRACT)


solid = part.part
